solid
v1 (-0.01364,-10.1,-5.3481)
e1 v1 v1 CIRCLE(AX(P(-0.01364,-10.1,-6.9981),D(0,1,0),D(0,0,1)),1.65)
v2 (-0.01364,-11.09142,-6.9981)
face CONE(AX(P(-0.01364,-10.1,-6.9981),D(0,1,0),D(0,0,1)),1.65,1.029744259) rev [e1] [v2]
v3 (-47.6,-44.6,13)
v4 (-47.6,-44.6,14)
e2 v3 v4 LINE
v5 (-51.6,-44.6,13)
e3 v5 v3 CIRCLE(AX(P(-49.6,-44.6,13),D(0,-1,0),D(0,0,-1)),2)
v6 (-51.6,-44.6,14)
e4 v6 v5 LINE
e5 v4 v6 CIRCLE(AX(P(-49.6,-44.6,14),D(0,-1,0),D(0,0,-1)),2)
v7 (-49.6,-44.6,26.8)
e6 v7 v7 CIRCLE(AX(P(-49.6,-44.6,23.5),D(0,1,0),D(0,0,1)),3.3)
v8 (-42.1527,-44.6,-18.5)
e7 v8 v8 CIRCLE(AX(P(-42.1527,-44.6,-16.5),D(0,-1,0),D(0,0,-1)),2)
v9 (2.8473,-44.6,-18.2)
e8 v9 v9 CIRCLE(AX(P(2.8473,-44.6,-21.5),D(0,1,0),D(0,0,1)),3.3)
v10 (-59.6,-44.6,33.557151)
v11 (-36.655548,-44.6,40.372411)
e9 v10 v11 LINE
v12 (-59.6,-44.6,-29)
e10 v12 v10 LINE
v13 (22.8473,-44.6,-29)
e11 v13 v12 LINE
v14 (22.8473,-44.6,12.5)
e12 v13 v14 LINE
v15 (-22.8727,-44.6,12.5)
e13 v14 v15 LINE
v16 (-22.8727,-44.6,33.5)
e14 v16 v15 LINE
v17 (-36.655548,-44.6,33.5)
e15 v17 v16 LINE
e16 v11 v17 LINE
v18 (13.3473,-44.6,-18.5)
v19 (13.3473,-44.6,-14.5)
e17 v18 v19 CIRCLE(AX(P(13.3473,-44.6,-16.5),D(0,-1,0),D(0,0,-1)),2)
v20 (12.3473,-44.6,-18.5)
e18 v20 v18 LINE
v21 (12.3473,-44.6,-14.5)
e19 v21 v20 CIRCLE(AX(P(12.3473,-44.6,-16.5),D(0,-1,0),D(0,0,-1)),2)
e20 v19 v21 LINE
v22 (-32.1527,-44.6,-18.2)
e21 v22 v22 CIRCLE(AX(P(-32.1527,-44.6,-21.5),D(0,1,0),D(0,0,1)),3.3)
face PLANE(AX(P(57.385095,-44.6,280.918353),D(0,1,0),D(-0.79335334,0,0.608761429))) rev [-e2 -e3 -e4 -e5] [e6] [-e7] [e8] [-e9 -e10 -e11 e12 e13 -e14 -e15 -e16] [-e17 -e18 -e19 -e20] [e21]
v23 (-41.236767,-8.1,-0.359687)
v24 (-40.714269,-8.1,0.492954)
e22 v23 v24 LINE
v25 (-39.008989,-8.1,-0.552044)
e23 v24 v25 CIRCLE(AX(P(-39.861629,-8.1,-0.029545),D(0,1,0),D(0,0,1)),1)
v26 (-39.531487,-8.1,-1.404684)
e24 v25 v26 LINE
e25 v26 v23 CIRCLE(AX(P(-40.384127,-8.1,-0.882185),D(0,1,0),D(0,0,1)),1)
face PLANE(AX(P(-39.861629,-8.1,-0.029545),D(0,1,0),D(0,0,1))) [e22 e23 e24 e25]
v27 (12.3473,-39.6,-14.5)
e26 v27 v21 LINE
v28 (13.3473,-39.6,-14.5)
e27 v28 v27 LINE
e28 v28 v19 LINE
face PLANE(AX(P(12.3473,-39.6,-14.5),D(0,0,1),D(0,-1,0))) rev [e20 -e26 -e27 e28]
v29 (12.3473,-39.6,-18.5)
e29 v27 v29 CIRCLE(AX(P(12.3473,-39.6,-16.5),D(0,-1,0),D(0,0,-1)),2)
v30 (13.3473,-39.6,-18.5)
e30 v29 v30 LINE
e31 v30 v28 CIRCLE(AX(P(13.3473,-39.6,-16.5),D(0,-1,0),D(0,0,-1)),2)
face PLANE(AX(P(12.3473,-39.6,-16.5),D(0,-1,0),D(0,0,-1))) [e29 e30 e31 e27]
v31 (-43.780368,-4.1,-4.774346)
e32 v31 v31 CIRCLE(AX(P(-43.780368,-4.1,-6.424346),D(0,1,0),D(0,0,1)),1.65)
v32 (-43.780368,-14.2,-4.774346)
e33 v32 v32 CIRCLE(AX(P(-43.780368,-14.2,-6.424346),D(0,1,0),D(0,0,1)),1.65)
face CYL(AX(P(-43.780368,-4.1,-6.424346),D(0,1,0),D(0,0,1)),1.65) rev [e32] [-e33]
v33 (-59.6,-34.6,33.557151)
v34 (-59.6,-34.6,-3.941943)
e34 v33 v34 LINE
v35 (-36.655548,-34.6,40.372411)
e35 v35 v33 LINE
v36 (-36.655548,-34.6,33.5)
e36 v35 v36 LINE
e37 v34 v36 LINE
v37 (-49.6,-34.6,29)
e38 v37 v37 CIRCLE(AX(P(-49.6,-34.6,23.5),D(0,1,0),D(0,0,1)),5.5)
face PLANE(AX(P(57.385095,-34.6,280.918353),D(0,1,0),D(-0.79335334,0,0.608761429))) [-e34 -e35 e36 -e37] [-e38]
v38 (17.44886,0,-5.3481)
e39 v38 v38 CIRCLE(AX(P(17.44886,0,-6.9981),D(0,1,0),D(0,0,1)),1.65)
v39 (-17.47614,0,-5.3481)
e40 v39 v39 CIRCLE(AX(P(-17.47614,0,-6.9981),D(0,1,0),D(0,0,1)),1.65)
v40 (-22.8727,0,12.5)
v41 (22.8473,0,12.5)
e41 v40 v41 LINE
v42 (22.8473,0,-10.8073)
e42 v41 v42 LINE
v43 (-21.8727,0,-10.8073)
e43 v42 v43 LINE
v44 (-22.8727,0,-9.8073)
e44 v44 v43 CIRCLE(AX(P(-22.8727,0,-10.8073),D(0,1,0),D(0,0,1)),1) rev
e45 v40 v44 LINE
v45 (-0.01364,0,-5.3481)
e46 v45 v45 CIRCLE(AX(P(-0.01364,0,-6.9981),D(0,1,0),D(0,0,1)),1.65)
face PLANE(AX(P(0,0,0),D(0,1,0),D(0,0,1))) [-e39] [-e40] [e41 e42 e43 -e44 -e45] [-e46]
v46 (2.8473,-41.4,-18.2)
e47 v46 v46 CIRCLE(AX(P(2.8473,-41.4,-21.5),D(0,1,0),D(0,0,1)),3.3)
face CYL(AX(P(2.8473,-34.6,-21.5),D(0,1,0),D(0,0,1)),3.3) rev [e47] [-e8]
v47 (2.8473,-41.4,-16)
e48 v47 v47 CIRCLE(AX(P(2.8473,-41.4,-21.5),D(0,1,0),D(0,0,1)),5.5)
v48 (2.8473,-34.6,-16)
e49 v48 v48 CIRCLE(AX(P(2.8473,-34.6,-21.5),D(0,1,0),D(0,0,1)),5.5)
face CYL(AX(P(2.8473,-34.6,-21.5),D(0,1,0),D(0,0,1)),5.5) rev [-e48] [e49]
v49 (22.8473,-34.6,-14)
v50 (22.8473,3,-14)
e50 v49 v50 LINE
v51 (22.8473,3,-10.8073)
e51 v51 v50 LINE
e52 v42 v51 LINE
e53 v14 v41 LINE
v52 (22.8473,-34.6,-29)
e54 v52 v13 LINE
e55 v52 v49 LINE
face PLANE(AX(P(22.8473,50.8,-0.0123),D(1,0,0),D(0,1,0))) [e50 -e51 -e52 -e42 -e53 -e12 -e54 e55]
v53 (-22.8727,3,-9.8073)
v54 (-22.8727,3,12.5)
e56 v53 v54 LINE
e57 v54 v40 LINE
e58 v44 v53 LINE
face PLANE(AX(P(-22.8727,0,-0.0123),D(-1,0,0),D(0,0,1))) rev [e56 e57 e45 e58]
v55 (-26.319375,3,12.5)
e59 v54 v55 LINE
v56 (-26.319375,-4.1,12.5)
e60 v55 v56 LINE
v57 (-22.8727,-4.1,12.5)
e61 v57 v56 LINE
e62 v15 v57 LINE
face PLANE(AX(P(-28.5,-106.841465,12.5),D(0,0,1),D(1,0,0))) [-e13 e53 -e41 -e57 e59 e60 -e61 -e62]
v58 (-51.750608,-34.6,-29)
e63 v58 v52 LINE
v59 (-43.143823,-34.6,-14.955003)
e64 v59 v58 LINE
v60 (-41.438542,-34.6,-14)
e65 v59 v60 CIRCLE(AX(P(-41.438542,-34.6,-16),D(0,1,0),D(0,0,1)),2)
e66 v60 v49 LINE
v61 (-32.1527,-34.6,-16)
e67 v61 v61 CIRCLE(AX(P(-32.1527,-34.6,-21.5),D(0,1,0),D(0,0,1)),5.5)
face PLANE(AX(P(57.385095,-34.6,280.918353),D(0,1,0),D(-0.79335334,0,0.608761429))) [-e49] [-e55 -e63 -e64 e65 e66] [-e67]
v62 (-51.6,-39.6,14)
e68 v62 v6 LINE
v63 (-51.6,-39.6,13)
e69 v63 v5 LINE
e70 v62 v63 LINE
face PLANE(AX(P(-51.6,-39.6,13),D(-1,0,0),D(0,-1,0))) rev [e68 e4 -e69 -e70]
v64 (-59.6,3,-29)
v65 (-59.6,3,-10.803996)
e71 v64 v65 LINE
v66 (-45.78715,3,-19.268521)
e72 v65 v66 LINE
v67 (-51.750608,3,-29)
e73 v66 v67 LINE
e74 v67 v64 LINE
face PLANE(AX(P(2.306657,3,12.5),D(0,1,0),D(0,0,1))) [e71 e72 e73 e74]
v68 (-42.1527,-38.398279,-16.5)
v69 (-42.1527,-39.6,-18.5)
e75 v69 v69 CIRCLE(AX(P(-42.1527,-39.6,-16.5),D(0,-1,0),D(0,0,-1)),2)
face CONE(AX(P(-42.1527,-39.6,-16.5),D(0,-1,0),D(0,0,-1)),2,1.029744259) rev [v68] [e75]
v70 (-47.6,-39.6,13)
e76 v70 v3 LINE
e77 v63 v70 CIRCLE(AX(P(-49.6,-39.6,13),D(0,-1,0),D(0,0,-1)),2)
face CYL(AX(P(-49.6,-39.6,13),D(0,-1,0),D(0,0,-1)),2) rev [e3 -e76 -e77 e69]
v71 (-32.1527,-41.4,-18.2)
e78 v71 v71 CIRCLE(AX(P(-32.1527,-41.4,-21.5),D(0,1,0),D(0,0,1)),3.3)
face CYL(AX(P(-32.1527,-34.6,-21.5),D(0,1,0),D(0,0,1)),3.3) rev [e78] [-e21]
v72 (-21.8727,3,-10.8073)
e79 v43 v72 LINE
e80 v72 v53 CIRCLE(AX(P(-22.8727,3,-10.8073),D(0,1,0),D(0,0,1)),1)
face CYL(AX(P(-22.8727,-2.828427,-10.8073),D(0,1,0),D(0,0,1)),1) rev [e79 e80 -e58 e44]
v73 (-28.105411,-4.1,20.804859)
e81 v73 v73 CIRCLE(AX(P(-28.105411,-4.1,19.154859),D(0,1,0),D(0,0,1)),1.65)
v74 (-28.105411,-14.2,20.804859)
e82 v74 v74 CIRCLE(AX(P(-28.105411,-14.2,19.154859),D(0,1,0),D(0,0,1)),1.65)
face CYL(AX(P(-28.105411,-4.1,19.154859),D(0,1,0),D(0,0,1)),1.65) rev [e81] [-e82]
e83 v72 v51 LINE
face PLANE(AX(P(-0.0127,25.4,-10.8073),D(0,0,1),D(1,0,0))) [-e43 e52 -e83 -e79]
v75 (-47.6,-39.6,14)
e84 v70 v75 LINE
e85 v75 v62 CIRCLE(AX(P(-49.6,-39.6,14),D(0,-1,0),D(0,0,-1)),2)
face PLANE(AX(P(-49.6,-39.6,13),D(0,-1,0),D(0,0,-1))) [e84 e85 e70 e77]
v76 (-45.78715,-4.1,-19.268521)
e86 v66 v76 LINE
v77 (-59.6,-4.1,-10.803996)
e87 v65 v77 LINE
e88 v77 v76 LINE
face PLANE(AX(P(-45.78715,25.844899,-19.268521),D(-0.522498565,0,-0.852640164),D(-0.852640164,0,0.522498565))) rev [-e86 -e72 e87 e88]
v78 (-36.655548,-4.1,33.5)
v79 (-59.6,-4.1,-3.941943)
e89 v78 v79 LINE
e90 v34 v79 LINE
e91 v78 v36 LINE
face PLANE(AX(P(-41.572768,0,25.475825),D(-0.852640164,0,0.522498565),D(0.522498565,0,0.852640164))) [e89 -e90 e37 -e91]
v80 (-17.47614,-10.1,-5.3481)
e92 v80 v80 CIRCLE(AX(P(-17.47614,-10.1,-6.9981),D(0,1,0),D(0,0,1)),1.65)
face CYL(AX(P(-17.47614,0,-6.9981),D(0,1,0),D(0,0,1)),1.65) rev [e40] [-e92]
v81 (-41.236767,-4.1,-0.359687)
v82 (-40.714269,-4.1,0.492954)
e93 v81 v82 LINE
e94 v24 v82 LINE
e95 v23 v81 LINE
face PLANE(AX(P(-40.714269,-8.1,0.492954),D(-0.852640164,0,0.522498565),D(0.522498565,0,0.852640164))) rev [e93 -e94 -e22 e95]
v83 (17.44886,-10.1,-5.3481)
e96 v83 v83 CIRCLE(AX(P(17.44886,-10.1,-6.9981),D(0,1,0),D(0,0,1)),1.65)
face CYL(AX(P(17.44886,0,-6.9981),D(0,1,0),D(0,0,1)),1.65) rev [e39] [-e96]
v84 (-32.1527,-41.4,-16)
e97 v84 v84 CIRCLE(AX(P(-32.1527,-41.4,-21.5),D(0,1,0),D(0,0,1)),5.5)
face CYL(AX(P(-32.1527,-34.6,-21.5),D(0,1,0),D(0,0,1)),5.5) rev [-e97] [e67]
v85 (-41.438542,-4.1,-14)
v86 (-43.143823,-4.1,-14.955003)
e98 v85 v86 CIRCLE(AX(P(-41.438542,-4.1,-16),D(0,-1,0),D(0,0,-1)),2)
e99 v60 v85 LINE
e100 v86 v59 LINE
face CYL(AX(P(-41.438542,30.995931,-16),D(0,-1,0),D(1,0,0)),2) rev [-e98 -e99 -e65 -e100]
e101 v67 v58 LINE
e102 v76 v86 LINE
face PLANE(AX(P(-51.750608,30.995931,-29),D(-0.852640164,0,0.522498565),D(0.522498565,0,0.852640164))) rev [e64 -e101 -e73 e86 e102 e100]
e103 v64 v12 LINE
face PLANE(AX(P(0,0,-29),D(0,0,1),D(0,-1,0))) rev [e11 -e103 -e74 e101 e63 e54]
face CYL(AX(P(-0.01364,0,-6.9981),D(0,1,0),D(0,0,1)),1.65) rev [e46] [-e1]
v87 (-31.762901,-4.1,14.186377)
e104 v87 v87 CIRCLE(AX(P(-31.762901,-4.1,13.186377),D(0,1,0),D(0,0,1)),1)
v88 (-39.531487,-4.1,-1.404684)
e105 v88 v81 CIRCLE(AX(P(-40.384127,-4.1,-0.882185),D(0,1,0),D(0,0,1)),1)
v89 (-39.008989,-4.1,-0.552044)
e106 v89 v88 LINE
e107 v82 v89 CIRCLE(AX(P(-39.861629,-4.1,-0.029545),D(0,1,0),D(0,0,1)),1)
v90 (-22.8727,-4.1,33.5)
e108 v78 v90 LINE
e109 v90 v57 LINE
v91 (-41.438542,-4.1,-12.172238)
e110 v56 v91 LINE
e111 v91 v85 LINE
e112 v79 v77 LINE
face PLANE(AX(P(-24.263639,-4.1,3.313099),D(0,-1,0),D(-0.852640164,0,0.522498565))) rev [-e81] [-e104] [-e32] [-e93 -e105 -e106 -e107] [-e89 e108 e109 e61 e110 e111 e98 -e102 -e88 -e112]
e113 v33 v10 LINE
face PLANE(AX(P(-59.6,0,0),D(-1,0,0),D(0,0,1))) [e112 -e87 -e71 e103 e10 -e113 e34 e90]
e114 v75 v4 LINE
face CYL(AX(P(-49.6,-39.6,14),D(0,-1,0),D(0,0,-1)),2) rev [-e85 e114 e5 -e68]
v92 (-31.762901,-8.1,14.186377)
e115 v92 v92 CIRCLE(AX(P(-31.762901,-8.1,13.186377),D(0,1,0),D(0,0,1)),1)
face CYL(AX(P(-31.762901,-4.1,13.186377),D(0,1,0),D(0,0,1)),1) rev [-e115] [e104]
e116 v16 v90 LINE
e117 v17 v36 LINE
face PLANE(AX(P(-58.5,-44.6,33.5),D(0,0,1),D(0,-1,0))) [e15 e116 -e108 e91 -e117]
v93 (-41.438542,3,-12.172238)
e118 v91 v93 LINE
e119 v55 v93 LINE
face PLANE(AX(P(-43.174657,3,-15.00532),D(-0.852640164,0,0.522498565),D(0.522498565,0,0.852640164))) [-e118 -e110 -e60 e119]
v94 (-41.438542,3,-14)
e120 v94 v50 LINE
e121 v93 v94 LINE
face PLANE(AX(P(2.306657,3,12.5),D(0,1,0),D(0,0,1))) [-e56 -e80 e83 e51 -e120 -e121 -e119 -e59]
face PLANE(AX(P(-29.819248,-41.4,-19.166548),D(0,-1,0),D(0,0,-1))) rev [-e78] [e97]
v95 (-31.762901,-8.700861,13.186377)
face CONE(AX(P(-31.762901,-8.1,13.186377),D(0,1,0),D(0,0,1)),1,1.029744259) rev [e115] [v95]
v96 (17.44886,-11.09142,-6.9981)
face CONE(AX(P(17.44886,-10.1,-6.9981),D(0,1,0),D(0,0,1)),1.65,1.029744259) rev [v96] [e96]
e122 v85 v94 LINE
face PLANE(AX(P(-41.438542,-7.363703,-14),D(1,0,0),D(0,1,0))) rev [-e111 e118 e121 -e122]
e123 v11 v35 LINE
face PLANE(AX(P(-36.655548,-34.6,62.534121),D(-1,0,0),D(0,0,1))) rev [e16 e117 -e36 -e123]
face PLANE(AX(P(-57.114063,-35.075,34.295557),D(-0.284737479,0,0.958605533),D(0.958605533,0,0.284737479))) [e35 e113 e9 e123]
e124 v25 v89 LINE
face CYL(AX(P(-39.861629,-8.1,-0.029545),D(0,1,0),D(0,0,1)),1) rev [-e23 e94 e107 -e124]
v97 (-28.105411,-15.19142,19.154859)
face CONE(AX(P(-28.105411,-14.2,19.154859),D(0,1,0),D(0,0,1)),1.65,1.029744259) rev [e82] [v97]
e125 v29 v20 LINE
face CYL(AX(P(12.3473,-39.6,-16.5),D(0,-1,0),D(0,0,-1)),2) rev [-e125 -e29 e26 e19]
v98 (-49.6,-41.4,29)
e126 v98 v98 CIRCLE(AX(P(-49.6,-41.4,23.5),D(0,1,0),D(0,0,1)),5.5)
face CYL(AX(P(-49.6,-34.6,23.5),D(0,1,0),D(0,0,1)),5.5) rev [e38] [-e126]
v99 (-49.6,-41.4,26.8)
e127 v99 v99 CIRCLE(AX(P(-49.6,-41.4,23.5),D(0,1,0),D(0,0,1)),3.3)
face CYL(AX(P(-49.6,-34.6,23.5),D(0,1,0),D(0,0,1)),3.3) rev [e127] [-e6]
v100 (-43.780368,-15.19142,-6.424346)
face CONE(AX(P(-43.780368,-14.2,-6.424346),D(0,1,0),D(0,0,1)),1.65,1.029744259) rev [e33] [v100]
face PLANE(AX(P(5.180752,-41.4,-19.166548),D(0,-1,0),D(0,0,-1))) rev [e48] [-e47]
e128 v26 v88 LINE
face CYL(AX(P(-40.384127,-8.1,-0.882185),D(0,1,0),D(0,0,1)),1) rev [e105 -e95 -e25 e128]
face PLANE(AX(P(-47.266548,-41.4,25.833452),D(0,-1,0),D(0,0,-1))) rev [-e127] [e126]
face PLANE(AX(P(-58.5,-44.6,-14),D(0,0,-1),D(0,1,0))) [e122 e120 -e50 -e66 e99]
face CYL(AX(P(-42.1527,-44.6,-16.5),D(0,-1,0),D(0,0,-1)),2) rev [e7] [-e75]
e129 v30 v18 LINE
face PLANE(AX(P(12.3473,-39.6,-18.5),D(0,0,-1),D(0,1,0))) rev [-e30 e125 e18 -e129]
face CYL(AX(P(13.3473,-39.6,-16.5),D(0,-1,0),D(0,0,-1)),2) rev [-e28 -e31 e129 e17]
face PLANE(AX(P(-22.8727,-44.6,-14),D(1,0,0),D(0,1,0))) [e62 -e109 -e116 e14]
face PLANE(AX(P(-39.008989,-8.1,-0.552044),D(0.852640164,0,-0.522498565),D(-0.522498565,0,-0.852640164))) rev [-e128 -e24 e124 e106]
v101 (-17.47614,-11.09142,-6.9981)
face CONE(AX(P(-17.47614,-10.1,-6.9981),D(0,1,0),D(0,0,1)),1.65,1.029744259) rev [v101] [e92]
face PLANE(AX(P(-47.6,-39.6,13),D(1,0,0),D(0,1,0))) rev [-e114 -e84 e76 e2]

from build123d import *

# Parameters (mm, degrees)
SKETCH_1_W                = 57
SKETCH_1_H                = 25
EXTRUDE_1_DEPTH           = 44.599999974
SKETCH_5_W                = 25
SKETCH_5_H                = 3
EXTRUDE_2_DEPTH           = 5.6273
SKETCH_6_W                = 57
SKETCH_6_H                = 3
EXTRUDE_3_DEPTH           = 1.6927
CUT_EXTRUDE_START         = -5.6527
SKETCH_7_W                = 27.592148155
SKETCH_7_H                = 60.039562987
CUT_EXTRUDE_1_DEPTH       = 5.6527
EXTRUDE_4_DEPTH           = 30
CUT_EXTRUDE_START_2       = -7.1
CUT_EXTRUDE_2_DEPTH       = 7.1
SKETCH_13_W               = 35.6273
SKETCH_13_H               = 47.5
EXTRUDE_5_DEPTH           = 40.5
EXTRUDE_6_REACH           = 100.635
SKETCH_14_W               = 1.5
SKETCH_14_H               = 47.599999992
EXTRUDE_7_DEPTH           = 7.1
FILLET_1_R                = 1
CUT_EXTRUDE_5_DEPTH       = 79.643181523
EXTRUDE_9_DEPTH           = 7.1
CUT_EXTRUDE_6_DEPTH       = 30.499999975
SKETCH_24_W               = 81.3473
SKETCH_24_H               = 10
EXTRUDE_10_DEPTH          = 15
OTHER_1_DEPTH             = 3
SKETCH_28_W               = 62.5
SKETCH_28_H               = 10.000000003
EXTRUDE_12_DEPTH          = 1.1
EXTRUDE_13_DEPTH          = 30.499999983
EXTRUDE_14_DEPTH          = 7.1
HOLE_WIZARD_1_AT_2_COUNT  = 2
HOLE_WIZARD_1_AT_2_PITCH  = 35
HOLE_WIZARD_1_AT_3_COUNT  = 2
HOLE_WIZARD_1_AT_3_PITCH  = 69.106579117
CUT_EXTRUDE_7_DEPTH       = 7.1
EXTRUDE_15_DEPTH          = 30.499999983
MM_2_D                    = 4
MM_2_DEPTH                = 5
MM_2_TIP                  = 1.201721238
HOLE_WIZARD_M4_2_D        = 3.3
HOLE_WIZARD_M4_2_DEPTH    = 10.1
HOLE_WIZARD_M4_2_TIP      = 0.991420021
CUT_EXTRUDE_9_DEPTH       = 5
CUT_EXTRUDE_10_DEPTH      = 4
MM_3_D                    = 2
MM_3_DEPTH                = 4
MM_3_TIP                  = 0.600860619
EXTRUDE_17_REACH          = 100.453
CUT_EXTRUDE_11_DEPTH      = 98.181703369
CUT_EXTRUDE_11_DEPTH_BACK = 2
SKETCH_45_W               = 49.558122087
SKETCH_45_H               = 30.499999975
HOLE_WIZARD_M4_3_D        = 3.3
HOLE_WIZARD_M4_3_DEPTH    = 10.1
HOLE_WIZARD_M4_3_TIP      = 0.991420021
EXTRUDE_18_REACH          = 99.199
SKETCH_51_W               = 22.944452165
SKETCH_51_H               = 10.000000002
FILLET_START              = -36
FILLET_2_DEPTH            = 39.000000001
CUT_EXTRUDE_12_DEPTH      = 7.1


with BuildPart() as part:
    # 草图1 → 凸台-拉伸1 (new body)
    with BuildSketch(Plane(origin=(0, 0, 0), x_dir=(1, 0, 0), z_dir=(0, 1, 0))):
        Rectangle(SKETCH_1_W, SKETCH_1_H)
    extrude(amount=-EXTRUDE_1_DEPTH)

    # 草图5 → 凸台-拉伸2 (add)
    with BuildSketch(Plane.ZY.offset(28.5)):
        with Locations((0, 1.5)):
            Rectangle(SKETCH_5_W, SKETCH_5_H)
    extrude(amount=-EXTRUDE_2_DEPTH)

    # 草图6 → 凸台-拉伸3 (add)
    with BuildSketch(Plane(origin=(0, 0, -12.5), x_dir=(-1, 0, 0), z_dir=(0, 0, -1))):
        with Locations((0, 1.5)):
            Rectangle(SKETCH_6_W, SKETCH_6_H)
    extrude(amount=-EXTRUDE_3_DEPTH)

    # 草图7 → 切除-拉伸1 (cut)
    with BuildSketch(Plane(origin=(28.5, 0, 0), x_dir=(0, 0, -1), z_dir=(1, 0, 0)).offset(CUT_EXTRUDE_START)):
        with Locations((-1.296074078, -14.58021848)):
            Rectangle(SKETCH_7_W, SKETCH_7_H)
    extrude(amount=CUT_EXTRUDE_1_DEPTH, mode=Mode.SUBTRACT)

    # 草图10 → 凸台-拉伸4 (add)
    with BuildSketch(Plane.ZY.offset(28.5)):
        Polygon((12.5, 3), (-12.5, 3), (-12.5, -44.599999977), (12.5, -44.599999976), align=None)
    extrude(amount=EXTRUDE_4_DEPTH)

    # 草图11 → 切除-拉伸2 (cut)
    with BuildSketch(Plane(origin=(0, 3, 0), x_dir=(1, 0, 0), z_dir=(0, 1, 0)).offset(CUT_EXTRUDE_START_2)):
        Polygon((-53.367671823, 12.5), (-38.04765212, -12.5), (-58.5, -12.5), (-58.5, 12.5), align=None)
    extrude(amount=CUT_EXTRUDE_2_DEPTH, mode=Mode.SUBTRACT)

    # 草图13 → 凸台-拉伸5 (add, through all)
    with BuildSketch(Plane(origin=(0, -4.1, 0), x_dir=(1, 0, 0), z_dir=(0, 1, 0))):
        with Locations((-40.68635, -9.75)):
            Rectangle(SKETCH_13_W, SKETCH_13_H)
    extrude(amount=-EXTRUDE_5_DEPTH)

    # 凸台-拉伸6: up to this plane
    extrude_6_end = Plane(origin=(-53.367671823, -36.400132102, -12.5), z_dir=(0.8526401643542372, 0, -0.5224985647157124))
    # 草图14 → 凸台-拉伸6 (add, up to the surface)
    with BuildSketch(Plane(origin=(22.8473, 0, 0), x_dir=(0, 0, -1), z_dir=(1, 0, 0)), mode=Mode.PRIVATE) as extrude_6_sk1:
        with Locations((13.25, -20.799999978)):
            Rectangle(SKETCH_14_W, SKETCH_14_H)
    extrude_6_tool1 = split(extrude(extrude_6_sk1.sketch, amount=-EXTRUDE_6_REACH, mode=Mode.PRIVATE), bisect_by=extrude_6_end, keep=Keep.BOTH, mode=Mode.PRIVATE)
    add(extrude_6_tool1.solids().sort_by_distance((22.8473, -20.8, -13.25))[0])

    # 草图15 → 凸台-拉伸7 (add)
    with BuildSketch(Plane(origin=(0, -4.1, 0), x_dir=(1, 0, 0), z_dir=(0, 1, 0))):
        Polygon((-51.701058733, 9.780334617), (-58.5, 5.61393805), (-58.5, 14), (-54.286873005, 14), align=None)
    extrude(amount=EXTRUDE_7_DEPTH)

    # 圆角1
    fillet_1_edges = [part.edges().sort_by_distance(p)[0] for p in [
        (-51.701058733, -0.55, -9.780334617),
    ]]
    fillet(fillet_1_edges, radius=FILLET_1_R)

    # 草图20 → 切除-拉伸5 (cut, through all)
    with BuildSketch(Plane(origin=(0, -4.1, 0), x_dir=(1, 0, 0), z_dir=(0, 1, 0))):
        with BuildLine():
            Line((-43.174657089, 15.005320264), (-26.319375153, -12.5))
            Line((-26.319375153, -12.5), (-38.04765212, -12.5))
            Line((-38.04765212, -12.5), (-51.178560168, 8.927694453))
            ThreePointArc((-51.178560168, 8.927694453), (-51.797754969, 9.377565808), (-52.553698897, 9.257836052))
            Line((-52.553698897, 9.257836052), (-58.5, 5.61393805))
            Line((-58.5, 5.61393805), (-58.5, 14))
            Line((-58.5, 14), (-44.815190658, 14))
            Line((-44.815190658, 14), (-43.174657089, 15.005320264))
        make_face()
    extrude(amount=CUT_EXTRUDE_5_DEPTH, mode=Mode.SUBTRACT)

    # 草图22 → 凸台-拉伸9 (add)
    with BuildSketch(Plane(origin=(0, -4.1, 0), x_dir=(1, 0, 0), z_dir=(0, 1, 0))):
        Polygon((-32.974322707, -30.348325438), (-22.8727, -25.0658203), (-22.8727, -33.5), (-32.974322707, -33.5), (-39.001203228, -33.5), align=None)
    extrude(amount=EXTRUDE_9_DEPTH)

    # 草图23 → 切除-拉伸6 (cut)
    with BuildSketch(Plane(origin=(0, -4.1, 0), x_dir=(1, 0, 0), z_dir=(0, 1, 0))):
        Polygon((-58.5, -1.680855591), (-39.001203228, -33.5), (-58.5, -33.5), align=None)
    extrude(amount=-CUT_EXTRUDE_6_DEPTH, mode=Mode.SUBTRACT)

    # 草图24 → 凸台-拉伸10 (add)
    with BuildSketch(Plane(origin=(0, 0, -14), x_dir=(-1, 0, 0), z_dir=(0, 0, -1))):
        with Locations((17.82635, -39.599999974)):
            Rectangle(SKETCH_24_W, SKETCH_24_H)
    extrude(amount=EXTRUDE_10_DEPTH)

    # 孔1: read off the stored shape, not the designer's step
    # 孔1 outline → 孔1 (cut)
    with BuildSketch(Plane(origin=(0, 0, 0), x_dir=(1, 0, 0), z_dir=(0, 1, 0))):
        with BuildLine():
            Line((-22.8727, 10.8073), (-21.8727, 10.8073))
            ThreePointArc((-21.8727, 10.8073), (-23.579806781, 11.514406781), (-22.8727, 9.8073))
            Line((-22.8727, 9.8073), (-22.8727, 10.8073))
        make_face()
    extrude(amount=OTHER_1_DEPTH, mode=Mode.SUBTRACT)

    # 草图28 → 凸台-拉伸12 (add)
    with BuildSketch(Plane.ZY.offset(58.5)):
        with Locations((2.25, -39.599999975)):
            Rectangle(SKETCH_28_W, SKETCH_28_H)
    extrude(amount=EXTRUDE_12_DEPTH)

    # 草图29 → 凸台-拉伸13 (add)
    with BuildSketch(Plane(origin=(4e-09, -34.599999975, 5e-09), x_dir=(1.0, 1.086597846680947e-10, 0), z_dir=(-1.086597846680947e-10, 1.0, -1.4160452072639443e-10))):
        Polygon((-58.500000004, -1.680855586), (-59.600000004, 12.594263512), (-59.600000004, 29.000000005), (-51.750607864, 29.000000005), (-42.55859604, 14.000000001), align=None)
    extrude(amount=EXTRUDE_13_DEPTH)

    # 草图30 → 凸台-拉伸14 (add)
    with BuildSketch(Plane(origin=(0, -4.1, 0), x_dir=(1, 0, 0), z_dir=(0, 1, 0))):
        Polygon((-59.600000003, 12.594263512), (-59.600000003, 29.000000009), (-51.750607861, 29), (-45.787149913, 19.268521086), (-58.576752378, 11.431042615), (-59.600000003, 10.803995664), align=None)
    extrude(amount=EXTRUDE_14_DEPTH)

    # 草图32 → 打孔尺寸(%根据)内六角圆柱头螺钉的类型1 (revolve, cut)
    with BuildSketch(Plane(origin=(2.8473, -34.599999978, -21.5), x_dir=(-0.7071067811865476, 2.3295446271224704e-11, 0.7071067811865476), z_dir=(0.7071067811865476, 1.7696358743338434e-10, 0.7071067811865476))):
        Polygon((0, 0), (0, 53.482840043), (3.3, 51.5), (3.3, 6.8), (5.5, 6.8), (5.5, 0), align=None)
    hole_wizard_1 = revolve(axis=Axis((2.847299999, -28.249999978, -21.500000001), (1.0865978671906271e-10, -1.0, 1.4160451561207773e-10)), mode=Mode.SUBTRACT)

    # 打孔尺寸(%根据)内六角圆柱头螺钉的类型1 at 2: 打孔尺寸(%根据)内六角圆柱头螺钉的类型1 ×2
    with Locations(*[(-i * HOLE_WIZARD_1_AT_2_PITCH, 0, 0) for i in range(1, HOLE_WIZARD_1_AT_2_COUNT)]):
        add(hole_wizard_1, mode=Mode.SUBTRACT)

    # 打孔尺寸(%根据)内六角圆柱头螺钉的类型1 at 3: 打孔尺寸(%根据)内六角圆柱头螺钉的类型1 ×2
    with Locations(*[Vector(-0.7589335294836127, 9.742788097477754e-12, 0.6511681025860729) * (i * HOLE_WIZARD_1_AT_3_PITCH) for i in range(1, HOLE_WIZARD_1_AT_3_COUNT)]):
        add(hole_wizard_1, mode=Mode.SUBTRACT)

    # 草图33 → 切除-拉伸7 (cut)
    with BuildSketch(Plane(origin=(0, 3, 0), x_dir=(1, 0, 0), z_dir=(0, 1, 0))):
        Polygon((-22.8727, -25.0658203), (-39.001203228, -33.5), (-22.8727, -33.5), align=None)
    extrude(amount=-CUT_EXTRUDE_7_DEPTH, mode=Mode.SUBTRACT)

    # 草图34 → 凸台-拉伸15 (add)
    with BuildSketch(Plane.XZ.offset(4.1)):
        Polygon((-59.600000003, -10.803995664), (-59.600000003, -12.594263512), (-59.46826756, -10.884721409), align=None)
    extrude(amount=EXTRUDE_15_DEPTH)

    # 大小mm 暗销孔2
    with Locations(Plane(origin=(-42.152699999, -44.599999982, -16.499999999), x_dir=(0, -1.42e-10, -1.0), z_dir=(1.09e-10, -1.0, 1.42e-10))):
        with Locations((0, 0)):
            Hole(MM_2_D / 2, depth=MM_2_DEPTH)
            with Locations((0, 0, -(MM_2_DEPTH + MM_2_TIP / 2))):  # 118° drill point
                Cone(0, MM_2_D / 2, MM_2_TIP, mode=Mode.SUBTRACT)

    # M4 螺纹孔2
    with Locations(Plane(origin=(-43.780367958, -4.1, -6.42434629), x_dir=(0, 0, 1), z_dir=(0, 1, 0))):
        with Locations((0, 0), (25.579204931, 15.674956941)):
            Hole(HOLE_WIZARD_M4_2_D / 2, depth=HOLE_WIZARD_M4_2_DEPTH)
            with Locations((0, 0, -(HOLE_WIZARD_M4_2_DEPTH + HOLE_WIZARD_M4_2_TIP / 2))):  # 118° drill point
                Cone(0, HOLE_WIZARD_M4_2_D / 2, HOLE_WIZARD_M4_2_TIP, mode=Mode.SUBTRACT)

    # 草图41 → 切除-拉伸9 (cut)
    with BuildSketch(Plane.XZ.offset(44.599999975)):
        with BuildLine():
            Line((12.347299996, -14.500000005), (13.347299996, -14.500000005))
            ThreePointArc((13.347299996, -14.500000005), (15.347299996, -16.500000005), (13.347299996, -18.500000005))
            Line((13.347299996, -18.500000005), (12.347299996, -18.500000005))
            ThreePointArc((12.347299996, -18.500000005), (10.347299996, -16.500000005), (12.347299996, -14.500000005))
        make_face()
        with BuildLine():
            Line((-51.600000004, 12.999999995), (-51.600000004, 13.999999995))
            ThreePointArc((-51.600000004, 13.999999995), (-49.600000004, 15.999999995), (-47.600000004, 13.999999995))
            Line((-47.600000004, 13.999999995), (-47.600000004, 12.999999995))
            ThreePointArc((-47.600000004, 12.999999995), (-49.600000004, 10.999999995), (-51.600000004, 12.999999995))
        make_face()
    extrude(amount=-CUT_EXTRUDE_9_DEPTH, mode=Mode.SUBTRACT)

    # 草图42 → 切除-拉伸10 (cut)
    with BuildSketch(Plane(origin=(0, -4.1, 0), x_dir=(1, 0, 0), z_dir=(0, 1, 0))):
        with BuildLine():
            Line((-40.714268887, -0.492953507), (-41.236767452, 0.359686657))
            ThreePointArc((-41.236767452, 0.359686657), (-40.906625852, 1.734825386), (-39.531487123, 1.404683786))
            Line((-39.531487123, 1.404683786), (-39.008988558, 0.552043622))
            ThreePointArc((-39.008988558, 0.552043622), (-39.339130158, -0.823095107), (-40.714268887, -0.492953507))
        make_face()
    extrude(amount=-CUT_EXTRUDE_10_DEPTH, mode=Mode.SUBTRACT)

    # 大小mm 暗销孔3
    with Locations(Plane(origin=(-31.76290097, -4.1, 13.18637749), x_dir=(0, 0, 1), z_dir=(0, 1, 0))):
        with Locations((0, 0)):
            Hole(MM_3_D / 2, depth=MM_3_DEPTH)
            with Locations((0, 0, -(MM_3_DEPTH + MM_3_TIP / 2))):  # 118° drill point
                Cone(0, MM_3_D / 2, MM_3_TIP, mode=Mode.SUBTRACT)

    # 凸台-拉伸17: up to this plane
    extrude_17_end = Plane(origin=(-59.6, 0, 0), z_dir=(-1, 0, 0))
    # 草图44 → 凸台-拉伸17 (add, up to the surface)
    with BuildSketch(Plane(origin=(-58.28344624, -6e-09, 4.491156285), x_dir=(0.07682938910269173, 7.509930174891973e-12, 0.9970442542686394), z_dir=(-0.9970442542686394, -9.745922515180297e-11, 0.07682938910269173)), mode=Mode.PRIVATE) as extrude_17_sk1:
        Polygon((-15.421459608, -4.099999994), (-15.421459608, -34.599999977), (-2.818631853, -34.599999975), (-2.818631853, -4.099999994), align=None)
    extrude_17_tool1 = split(extrude(extrude_17_sk1.sketch, amount=EXTRUDE_17_REACH, mode=Mode.PRIVATE), bisect_by=extrude_17_end, keep=Keep.BOTH, mode=Mode.PRIVATE)
    add(extrude_17_tool1.solids().sort_by_distance((-58.984134, -19.35, -4.601933))[0])

    # 草图45 → 切除-拉伸11 (cut, two sides: drawn at the far end of the back side and taken through both)
    with BuildSketch(Plane(origin=(-43.278048766, 0, 26.520822393), x_dir=(0.5224985647157137, 0, 0.8526401643542364), z_dir=(-0.8526401643542364, 0, 0.5224985647157137)).offset(-CUT_EXTRUDE_11_DEPTH_BACK)):
        with Locations((-13.32361838, -19.349999988)):
            Rectangle(SKETCH_45_W, SKETCH_45_H)
    extrude(amount=CUT_EXTRUDE_11_DEPTH + CUT_EXTRUDE_11_DEPTH_BACK, mode=Mode.SUBTRACT)

    # M4 螺纹孔3
    with Locations(Plane(origin=(17.448859608, 0, -6.998100273), x_dir=(0, 0, 1), z_dir=(0, 1, 0))):
        with Locations((0, 0), (0, -17.4625), (0, -34.925)):
            Hole(HOLE_WIZARD_M4_3_D / 2, depth=HOLE_WIZARD_M4_3_DEPTH)
            with Locations((0, 0, -(HOLE_WIZARD_M4_3_DEPTH + HOLE_WIZARD_M4_3_TIP / 2))):  # 118° drill point
                Cone(0, HOLE_WIZARD_M4_3_D / 2, HOLE_WIZARD_M4_3_TIP, mode=Mode.SUBTRACT)

    # 凸台-拉伸18: up to this plane
    extrude_18_end = Plane(origin=(-57.114062804, -35.075, 34.295556517), z_dir=(-0.2847374793032547, -5.216625563406907e-15, 0.9586055329905147))
    # 草图51 → 凸台-拉伸18 (add, up to the surface)
    with BuildSketch(Plane.XY.offset(33.5), mode=Mode.PRIVATE) as extrude_18_sk1:
        with Locations((-48.127773918, -39.599999976)):
            Rectangle(SKETCH_51_W, SKETCH_51_H)
    extrude_18_tool1 = split(extrude(extrude_18_sk1.sketch, amount=EXTRUDE_18_REACH, mode=Mode.PRIVATE), bisect_by=extrude_18_end, keep=Keep.BOTH, mode=Mode.PRIVATE)
    add(extrude_18_tool1.solids().sort_by_distance((-48.127774, -39.6, 33.5))[0])

    # 圆角2: read off the stored shape, not the designer's step
    # 圆角2 outline → 圆角2 (add)
    with BuildSketch(Plane(origin=(0, 0, 0), x_dir=(1.0, 2.18834822099883e-11, 0), z_dir=(-2.18834822099883e-11, 1.0, 0)).offset(FILLET_START)):
        with BuildLine():
            Line((-42.558596039, 14), (-41.438542222, 14))
            ThreePointArc((-41.438542222, 14), (-42.415784705, 14.255007986), (-43.143822551, 14.955002871))
            Line((-43.143822551, 14.955002871), (-42.558596039, 14))
        make_face()
    extrude(amount=FILLET_2_DEPTH)

    # 草图53 → 切除-拉伸12 (cut)
    with BuildSketch(Plane(origin=(0, 3, 0), x_dir=(1, 0, 0), z_dir=(0, 1, 0)).offset(CUT_EXTRUDE_START_2)):
        with BuildLine():
            Line((-41.438542222, 14), (-41.438542222, 12.172238288))
            Line((-41.438542222, 12.172238288), (-43.14382255, 14.955002871))
            ThreePointArc((-43.14382255, 14.955002871), (-42.415784705, 14.255007986), (-41.438542222, 14))
        make_face()
    extrude(amount=CUT_EXTRUDE_12_DEPTH, mode=Mode.SUBTRACT)


solid = part.part
